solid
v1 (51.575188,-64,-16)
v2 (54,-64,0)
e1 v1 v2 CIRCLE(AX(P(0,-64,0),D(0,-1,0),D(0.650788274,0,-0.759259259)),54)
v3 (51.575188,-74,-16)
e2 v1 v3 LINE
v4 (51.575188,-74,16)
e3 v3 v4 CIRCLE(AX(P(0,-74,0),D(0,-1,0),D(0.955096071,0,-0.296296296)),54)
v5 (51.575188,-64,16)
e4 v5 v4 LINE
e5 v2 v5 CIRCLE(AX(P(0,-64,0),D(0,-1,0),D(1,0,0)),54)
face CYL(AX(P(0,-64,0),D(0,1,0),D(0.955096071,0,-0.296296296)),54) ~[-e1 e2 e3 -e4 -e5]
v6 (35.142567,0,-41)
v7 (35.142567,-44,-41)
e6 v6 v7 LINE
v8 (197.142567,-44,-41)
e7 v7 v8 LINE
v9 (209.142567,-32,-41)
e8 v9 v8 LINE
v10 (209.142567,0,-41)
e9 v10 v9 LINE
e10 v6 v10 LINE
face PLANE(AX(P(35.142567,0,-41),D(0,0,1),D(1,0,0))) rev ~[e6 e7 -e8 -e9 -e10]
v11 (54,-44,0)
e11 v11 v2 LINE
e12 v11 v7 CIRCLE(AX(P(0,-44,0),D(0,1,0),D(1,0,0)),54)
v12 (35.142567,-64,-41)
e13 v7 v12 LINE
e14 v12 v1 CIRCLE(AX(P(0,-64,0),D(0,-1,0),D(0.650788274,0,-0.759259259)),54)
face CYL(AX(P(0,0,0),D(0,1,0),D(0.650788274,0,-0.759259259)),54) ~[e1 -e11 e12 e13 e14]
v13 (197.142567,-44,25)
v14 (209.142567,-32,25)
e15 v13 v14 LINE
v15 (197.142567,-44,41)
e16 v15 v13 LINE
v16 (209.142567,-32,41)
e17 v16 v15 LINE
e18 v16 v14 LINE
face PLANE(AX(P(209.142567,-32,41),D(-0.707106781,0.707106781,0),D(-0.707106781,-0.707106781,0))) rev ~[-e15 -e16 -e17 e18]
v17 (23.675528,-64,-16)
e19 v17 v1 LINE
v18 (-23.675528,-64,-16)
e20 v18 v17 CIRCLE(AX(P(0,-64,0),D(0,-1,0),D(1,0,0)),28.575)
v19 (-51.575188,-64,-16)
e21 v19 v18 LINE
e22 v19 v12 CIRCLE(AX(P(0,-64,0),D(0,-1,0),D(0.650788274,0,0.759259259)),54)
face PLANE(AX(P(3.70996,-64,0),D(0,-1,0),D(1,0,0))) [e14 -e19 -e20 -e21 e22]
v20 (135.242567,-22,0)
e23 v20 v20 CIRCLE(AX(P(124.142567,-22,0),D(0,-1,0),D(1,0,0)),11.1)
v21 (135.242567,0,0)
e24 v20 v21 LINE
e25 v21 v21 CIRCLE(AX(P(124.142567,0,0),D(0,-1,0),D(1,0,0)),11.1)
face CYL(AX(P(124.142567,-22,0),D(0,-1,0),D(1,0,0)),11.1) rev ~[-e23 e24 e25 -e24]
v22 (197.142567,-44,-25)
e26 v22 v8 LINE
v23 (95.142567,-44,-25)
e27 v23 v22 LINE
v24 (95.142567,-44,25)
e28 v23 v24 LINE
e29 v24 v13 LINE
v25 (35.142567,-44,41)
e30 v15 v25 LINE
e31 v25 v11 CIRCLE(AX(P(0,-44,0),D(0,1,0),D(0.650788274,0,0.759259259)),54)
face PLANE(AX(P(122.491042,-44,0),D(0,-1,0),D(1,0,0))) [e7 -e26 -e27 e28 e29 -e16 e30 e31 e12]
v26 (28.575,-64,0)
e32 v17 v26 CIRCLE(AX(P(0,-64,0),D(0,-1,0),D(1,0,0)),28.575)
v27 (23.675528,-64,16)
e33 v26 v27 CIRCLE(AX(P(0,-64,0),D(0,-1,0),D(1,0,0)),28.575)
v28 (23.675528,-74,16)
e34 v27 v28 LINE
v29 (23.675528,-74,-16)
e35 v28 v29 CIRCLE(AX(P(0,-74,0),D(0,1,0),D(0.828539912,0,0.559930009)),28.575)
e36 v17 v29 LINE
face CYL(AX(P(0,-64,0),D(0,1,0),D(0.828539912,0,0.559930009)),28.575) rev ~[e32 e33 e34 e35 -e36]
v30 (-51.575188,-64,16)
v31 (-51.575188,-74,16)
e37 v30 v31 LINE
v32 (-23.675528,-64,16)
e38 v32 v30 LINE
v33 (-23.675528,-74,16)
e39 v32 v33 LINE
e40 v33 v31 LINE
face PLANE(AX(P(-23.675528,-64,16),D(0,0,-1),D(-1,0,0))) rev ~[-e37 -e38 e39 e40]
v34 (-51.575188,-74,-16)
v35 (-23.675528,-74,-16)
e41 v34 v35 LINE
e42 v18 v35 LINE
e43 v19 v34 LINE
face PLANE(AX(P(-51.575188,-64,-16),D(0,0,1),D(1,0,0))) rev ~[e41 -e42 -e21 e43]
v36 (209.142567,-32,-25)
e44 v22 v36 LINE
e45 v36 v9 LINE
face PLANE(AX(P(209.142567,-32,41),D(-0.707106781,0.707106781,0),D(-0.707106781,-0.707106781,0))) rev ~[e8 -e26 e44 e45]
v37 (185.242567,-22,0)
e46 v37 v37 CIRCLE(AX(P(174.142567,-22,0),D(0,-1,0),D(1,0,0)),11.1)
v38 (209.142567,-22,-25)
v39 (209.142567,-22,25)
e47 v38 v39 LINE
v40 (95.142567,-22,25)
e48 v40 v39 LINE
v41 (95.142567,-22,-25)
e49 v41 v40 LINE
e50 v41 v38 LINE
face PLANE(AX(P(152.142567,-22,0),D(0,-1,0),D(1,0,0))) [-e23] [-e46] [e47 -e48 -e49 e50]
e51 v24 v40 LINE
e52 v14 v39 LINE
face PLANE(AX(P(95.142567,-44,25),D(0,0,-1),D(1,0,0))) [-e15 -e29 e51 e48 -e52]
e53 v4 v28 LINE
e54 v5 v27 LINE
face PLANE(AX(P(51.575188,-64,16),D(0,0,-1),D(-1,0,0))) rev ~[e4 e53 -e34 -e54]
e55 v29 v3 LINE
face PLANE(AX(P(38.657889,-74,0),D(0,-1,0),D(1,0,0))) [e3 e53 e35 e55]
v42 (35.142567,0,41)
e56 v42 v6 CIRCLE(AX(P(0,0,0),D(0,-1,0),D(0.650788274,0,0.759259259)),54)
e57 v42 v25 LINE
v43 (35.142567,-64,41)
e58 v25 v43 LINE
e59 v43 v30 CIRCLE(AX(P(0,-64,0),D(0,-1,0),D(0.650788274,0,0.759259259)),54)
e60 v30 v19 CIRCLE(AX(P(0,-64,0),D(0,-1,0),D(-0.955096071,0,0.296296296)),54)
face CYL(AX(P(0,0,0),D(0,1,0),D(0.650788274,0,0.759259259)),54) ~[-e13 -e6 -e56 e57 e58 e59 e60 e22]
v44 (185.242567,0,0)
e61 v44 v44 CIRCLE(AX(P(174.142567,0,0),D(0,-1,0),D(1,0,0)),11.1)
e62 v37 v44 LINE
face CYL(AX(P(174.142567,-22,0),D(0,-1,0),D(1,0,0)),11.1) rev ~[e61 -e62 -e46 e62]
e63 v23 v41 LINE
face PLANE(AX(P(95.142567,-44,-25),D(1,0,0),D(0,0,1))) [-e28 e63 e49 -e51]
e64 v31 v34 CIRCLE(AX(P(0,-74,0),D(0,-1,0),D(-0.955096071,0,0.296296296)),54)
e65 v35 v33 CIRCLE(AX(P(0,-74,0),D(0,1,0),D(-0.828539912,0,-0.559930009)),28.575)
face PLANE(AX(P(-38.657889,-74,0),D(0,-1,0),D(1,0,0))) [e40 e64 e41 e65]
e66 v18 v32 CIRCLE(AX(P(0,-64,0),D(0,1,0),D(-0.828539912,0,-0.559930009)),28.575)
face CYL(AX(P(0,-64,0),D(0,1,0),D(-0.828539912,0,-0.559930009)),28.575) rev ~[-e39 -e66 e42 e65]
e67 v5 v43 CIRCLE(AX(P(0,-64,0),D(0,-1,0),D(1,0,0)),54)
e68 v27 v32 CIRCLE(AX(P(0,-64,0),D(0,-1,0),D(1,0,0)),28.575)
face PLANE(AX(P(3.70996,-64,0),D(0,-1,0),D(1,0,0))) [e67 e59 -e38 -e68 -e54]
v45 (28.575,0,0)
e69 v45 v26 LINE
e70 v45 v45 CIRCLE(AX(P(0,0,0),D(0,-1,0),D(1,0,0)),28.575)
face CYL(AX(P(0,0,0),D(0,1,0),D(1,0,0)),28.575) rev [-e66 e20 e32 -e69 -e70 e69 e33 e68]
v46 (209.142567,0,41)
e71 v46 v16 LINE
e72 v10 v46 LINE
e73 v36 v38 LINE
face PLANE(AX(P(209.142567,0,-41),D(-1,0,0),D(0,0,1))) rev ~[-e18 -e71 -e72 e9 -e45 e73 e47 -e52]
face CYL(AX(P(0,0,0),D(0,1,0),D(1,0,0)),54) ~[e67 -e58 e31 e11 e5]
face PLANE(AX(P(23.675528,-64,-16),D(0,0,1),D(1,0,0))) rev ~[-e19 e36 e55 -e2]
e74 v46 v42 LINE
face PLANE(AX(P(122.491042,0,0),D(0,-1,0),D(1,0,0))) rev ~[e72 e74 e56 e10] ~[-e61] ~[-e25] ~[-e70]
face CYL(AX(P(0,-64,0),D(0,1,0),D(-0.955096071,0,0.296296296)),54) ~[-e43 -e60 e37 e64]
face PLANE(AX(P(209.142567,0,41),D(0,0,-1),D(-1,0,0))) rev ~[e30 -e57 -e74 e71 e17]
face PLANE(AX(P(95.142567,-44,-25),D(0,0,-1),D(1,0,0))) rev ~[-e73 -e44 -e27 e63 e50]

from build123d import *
from build123d import SkipClean  # not in build123d's __all__

# Parameters (mm, degrees)
F0_R          = 28.575
F1_DEPTH      = 64
F2_DEPTH      = 44
F4_W          = 114
F4_H          = 50
F5_DEPTH      = 22
F6_DEPTH      = 95.001
F6_DEPTH_BACK = 25
F7_R          = 11.1
F8_DEPTH      = 22.001
F10_DEPTH     = 10
F12_DEPTH     = 10


# Not quite as in the source:
# - after a boolean that leaves OpenCascade's solid faulty, fix() repairs it


with BuildPart() as f1:
    # F0 (on Front) → F1 (new body)
    with BuildSketch(Plane.XZ):
        with BuildLine():
            ThreePointArc((35.1425667816, -41), (49.0596504584, -22.5643678594), (54, 0))
            ThreePointArc((54, 0), (49.0596504584, 22.5643678594), (35.1425667816, 41))
            ThreePointArc((35.1425667816, 41), (-54, 0), (35.1425667816, -41))
        make_face()
        Circle(F0_R, mode=Mode.SUBTRACT)
    extrude(amount=F1_DEPTH)

    # F0 (on Front) → F2 (join)
    with BuildSketch(Plane.XZ):
        with BuildLine():
            ThreePointArc((35.1425667816, 41), (49.0596504584, 22.5643678594), (54, 0))
            ThreePointArc((54, 0), (49.0596504584, -22.5643678594), (35.1425667816, -41))
            Line((35.1425667816, -41), (209.1425667816, -41))
            Line((209.1425667816, -41), (209.1425667816, 41))
            Line((209.1425667816, 41), (35.1425667816, 41))
        make_face()
    extrude(amount=F2_DEPTH)

    # F4 (on face) → F5 (cut)
    with BuildSketch(Plane.XZ.offset(44)):
        with Locations((152.1425667816, 0)):
            Rectangle(F4_W, F4_H)
    extrude(amount=-F5_DEPTH, mode=Mode.SUBTRACT)

    # F3 (on face) → F6 (cut, two sides)
    with BuildSketch(Plane.XY.offset(41)) as f6_sk:
        Polygon((209.1425667816, -32), (197.1425667816, -44), (209.1425667816, -44), align=None)
    extrude(amount=-F6_DEPTH, mode=Mode.SUBTRACT)
    extrude(f6_sk.sketch, amount=F6_DEPTH_BACK, mode=Mode.SUBTRACT)

    # F7 (on face) → F8 (cut, through all)
    with BuildSketch(Plane.XZ.offset(22)):
        with Locations((124.1425667816, 0)):
            Circle(F7_R)
        with Locations((174.1425667816, 0)):
            Circle(F7_R)
    extrude(amount=-F8_DEPTH, mode=Mode.SUBTRACT)

    # F9 (on face) → F10 (join)
    with BuildSketch(Plane.XZ.offset(64)):
        with BuildLine():
            ThreePointArc((-23.6755279772, -16), (-28.575, 0), (-23.6755279772, 16))
            Line((-23.6755279772, 16), (-51.5751878329, 16))
            ThreePointArc((-51.5751878329, 16), (-54, 0), (-51.5751878329, -16))
            Line((-51.5751878329, -16), (-23.6755279772, -16))
        make_face()
    extrude(amount=F10_DEPTH)

    add(f1.part.fix(), mode=Mode.REPLACE)

    # F11 (on face) → F12 (join)
    with BuildSketch(Plane.XZ.offset(64)):
        with BuildLine():
            ThreePointArc((23.6755279772, 16), (28.575, 0), (23.6755279772, -16))
            Line((23.6755279772, -16), (51.5751878329, -16))
            ThreePointArc((51.5751878329, -16), (54, 0), (51.5751878329, 16))
            Line((51.5751878329, 16), (23.6755279772, 16))
        make_face()
    with SkipClean():  # cleaning this boolean's faces spoils the solid; the shape is the same uncleaned
        extrude(amount=F12_DEPTH)


solid = f1.part
